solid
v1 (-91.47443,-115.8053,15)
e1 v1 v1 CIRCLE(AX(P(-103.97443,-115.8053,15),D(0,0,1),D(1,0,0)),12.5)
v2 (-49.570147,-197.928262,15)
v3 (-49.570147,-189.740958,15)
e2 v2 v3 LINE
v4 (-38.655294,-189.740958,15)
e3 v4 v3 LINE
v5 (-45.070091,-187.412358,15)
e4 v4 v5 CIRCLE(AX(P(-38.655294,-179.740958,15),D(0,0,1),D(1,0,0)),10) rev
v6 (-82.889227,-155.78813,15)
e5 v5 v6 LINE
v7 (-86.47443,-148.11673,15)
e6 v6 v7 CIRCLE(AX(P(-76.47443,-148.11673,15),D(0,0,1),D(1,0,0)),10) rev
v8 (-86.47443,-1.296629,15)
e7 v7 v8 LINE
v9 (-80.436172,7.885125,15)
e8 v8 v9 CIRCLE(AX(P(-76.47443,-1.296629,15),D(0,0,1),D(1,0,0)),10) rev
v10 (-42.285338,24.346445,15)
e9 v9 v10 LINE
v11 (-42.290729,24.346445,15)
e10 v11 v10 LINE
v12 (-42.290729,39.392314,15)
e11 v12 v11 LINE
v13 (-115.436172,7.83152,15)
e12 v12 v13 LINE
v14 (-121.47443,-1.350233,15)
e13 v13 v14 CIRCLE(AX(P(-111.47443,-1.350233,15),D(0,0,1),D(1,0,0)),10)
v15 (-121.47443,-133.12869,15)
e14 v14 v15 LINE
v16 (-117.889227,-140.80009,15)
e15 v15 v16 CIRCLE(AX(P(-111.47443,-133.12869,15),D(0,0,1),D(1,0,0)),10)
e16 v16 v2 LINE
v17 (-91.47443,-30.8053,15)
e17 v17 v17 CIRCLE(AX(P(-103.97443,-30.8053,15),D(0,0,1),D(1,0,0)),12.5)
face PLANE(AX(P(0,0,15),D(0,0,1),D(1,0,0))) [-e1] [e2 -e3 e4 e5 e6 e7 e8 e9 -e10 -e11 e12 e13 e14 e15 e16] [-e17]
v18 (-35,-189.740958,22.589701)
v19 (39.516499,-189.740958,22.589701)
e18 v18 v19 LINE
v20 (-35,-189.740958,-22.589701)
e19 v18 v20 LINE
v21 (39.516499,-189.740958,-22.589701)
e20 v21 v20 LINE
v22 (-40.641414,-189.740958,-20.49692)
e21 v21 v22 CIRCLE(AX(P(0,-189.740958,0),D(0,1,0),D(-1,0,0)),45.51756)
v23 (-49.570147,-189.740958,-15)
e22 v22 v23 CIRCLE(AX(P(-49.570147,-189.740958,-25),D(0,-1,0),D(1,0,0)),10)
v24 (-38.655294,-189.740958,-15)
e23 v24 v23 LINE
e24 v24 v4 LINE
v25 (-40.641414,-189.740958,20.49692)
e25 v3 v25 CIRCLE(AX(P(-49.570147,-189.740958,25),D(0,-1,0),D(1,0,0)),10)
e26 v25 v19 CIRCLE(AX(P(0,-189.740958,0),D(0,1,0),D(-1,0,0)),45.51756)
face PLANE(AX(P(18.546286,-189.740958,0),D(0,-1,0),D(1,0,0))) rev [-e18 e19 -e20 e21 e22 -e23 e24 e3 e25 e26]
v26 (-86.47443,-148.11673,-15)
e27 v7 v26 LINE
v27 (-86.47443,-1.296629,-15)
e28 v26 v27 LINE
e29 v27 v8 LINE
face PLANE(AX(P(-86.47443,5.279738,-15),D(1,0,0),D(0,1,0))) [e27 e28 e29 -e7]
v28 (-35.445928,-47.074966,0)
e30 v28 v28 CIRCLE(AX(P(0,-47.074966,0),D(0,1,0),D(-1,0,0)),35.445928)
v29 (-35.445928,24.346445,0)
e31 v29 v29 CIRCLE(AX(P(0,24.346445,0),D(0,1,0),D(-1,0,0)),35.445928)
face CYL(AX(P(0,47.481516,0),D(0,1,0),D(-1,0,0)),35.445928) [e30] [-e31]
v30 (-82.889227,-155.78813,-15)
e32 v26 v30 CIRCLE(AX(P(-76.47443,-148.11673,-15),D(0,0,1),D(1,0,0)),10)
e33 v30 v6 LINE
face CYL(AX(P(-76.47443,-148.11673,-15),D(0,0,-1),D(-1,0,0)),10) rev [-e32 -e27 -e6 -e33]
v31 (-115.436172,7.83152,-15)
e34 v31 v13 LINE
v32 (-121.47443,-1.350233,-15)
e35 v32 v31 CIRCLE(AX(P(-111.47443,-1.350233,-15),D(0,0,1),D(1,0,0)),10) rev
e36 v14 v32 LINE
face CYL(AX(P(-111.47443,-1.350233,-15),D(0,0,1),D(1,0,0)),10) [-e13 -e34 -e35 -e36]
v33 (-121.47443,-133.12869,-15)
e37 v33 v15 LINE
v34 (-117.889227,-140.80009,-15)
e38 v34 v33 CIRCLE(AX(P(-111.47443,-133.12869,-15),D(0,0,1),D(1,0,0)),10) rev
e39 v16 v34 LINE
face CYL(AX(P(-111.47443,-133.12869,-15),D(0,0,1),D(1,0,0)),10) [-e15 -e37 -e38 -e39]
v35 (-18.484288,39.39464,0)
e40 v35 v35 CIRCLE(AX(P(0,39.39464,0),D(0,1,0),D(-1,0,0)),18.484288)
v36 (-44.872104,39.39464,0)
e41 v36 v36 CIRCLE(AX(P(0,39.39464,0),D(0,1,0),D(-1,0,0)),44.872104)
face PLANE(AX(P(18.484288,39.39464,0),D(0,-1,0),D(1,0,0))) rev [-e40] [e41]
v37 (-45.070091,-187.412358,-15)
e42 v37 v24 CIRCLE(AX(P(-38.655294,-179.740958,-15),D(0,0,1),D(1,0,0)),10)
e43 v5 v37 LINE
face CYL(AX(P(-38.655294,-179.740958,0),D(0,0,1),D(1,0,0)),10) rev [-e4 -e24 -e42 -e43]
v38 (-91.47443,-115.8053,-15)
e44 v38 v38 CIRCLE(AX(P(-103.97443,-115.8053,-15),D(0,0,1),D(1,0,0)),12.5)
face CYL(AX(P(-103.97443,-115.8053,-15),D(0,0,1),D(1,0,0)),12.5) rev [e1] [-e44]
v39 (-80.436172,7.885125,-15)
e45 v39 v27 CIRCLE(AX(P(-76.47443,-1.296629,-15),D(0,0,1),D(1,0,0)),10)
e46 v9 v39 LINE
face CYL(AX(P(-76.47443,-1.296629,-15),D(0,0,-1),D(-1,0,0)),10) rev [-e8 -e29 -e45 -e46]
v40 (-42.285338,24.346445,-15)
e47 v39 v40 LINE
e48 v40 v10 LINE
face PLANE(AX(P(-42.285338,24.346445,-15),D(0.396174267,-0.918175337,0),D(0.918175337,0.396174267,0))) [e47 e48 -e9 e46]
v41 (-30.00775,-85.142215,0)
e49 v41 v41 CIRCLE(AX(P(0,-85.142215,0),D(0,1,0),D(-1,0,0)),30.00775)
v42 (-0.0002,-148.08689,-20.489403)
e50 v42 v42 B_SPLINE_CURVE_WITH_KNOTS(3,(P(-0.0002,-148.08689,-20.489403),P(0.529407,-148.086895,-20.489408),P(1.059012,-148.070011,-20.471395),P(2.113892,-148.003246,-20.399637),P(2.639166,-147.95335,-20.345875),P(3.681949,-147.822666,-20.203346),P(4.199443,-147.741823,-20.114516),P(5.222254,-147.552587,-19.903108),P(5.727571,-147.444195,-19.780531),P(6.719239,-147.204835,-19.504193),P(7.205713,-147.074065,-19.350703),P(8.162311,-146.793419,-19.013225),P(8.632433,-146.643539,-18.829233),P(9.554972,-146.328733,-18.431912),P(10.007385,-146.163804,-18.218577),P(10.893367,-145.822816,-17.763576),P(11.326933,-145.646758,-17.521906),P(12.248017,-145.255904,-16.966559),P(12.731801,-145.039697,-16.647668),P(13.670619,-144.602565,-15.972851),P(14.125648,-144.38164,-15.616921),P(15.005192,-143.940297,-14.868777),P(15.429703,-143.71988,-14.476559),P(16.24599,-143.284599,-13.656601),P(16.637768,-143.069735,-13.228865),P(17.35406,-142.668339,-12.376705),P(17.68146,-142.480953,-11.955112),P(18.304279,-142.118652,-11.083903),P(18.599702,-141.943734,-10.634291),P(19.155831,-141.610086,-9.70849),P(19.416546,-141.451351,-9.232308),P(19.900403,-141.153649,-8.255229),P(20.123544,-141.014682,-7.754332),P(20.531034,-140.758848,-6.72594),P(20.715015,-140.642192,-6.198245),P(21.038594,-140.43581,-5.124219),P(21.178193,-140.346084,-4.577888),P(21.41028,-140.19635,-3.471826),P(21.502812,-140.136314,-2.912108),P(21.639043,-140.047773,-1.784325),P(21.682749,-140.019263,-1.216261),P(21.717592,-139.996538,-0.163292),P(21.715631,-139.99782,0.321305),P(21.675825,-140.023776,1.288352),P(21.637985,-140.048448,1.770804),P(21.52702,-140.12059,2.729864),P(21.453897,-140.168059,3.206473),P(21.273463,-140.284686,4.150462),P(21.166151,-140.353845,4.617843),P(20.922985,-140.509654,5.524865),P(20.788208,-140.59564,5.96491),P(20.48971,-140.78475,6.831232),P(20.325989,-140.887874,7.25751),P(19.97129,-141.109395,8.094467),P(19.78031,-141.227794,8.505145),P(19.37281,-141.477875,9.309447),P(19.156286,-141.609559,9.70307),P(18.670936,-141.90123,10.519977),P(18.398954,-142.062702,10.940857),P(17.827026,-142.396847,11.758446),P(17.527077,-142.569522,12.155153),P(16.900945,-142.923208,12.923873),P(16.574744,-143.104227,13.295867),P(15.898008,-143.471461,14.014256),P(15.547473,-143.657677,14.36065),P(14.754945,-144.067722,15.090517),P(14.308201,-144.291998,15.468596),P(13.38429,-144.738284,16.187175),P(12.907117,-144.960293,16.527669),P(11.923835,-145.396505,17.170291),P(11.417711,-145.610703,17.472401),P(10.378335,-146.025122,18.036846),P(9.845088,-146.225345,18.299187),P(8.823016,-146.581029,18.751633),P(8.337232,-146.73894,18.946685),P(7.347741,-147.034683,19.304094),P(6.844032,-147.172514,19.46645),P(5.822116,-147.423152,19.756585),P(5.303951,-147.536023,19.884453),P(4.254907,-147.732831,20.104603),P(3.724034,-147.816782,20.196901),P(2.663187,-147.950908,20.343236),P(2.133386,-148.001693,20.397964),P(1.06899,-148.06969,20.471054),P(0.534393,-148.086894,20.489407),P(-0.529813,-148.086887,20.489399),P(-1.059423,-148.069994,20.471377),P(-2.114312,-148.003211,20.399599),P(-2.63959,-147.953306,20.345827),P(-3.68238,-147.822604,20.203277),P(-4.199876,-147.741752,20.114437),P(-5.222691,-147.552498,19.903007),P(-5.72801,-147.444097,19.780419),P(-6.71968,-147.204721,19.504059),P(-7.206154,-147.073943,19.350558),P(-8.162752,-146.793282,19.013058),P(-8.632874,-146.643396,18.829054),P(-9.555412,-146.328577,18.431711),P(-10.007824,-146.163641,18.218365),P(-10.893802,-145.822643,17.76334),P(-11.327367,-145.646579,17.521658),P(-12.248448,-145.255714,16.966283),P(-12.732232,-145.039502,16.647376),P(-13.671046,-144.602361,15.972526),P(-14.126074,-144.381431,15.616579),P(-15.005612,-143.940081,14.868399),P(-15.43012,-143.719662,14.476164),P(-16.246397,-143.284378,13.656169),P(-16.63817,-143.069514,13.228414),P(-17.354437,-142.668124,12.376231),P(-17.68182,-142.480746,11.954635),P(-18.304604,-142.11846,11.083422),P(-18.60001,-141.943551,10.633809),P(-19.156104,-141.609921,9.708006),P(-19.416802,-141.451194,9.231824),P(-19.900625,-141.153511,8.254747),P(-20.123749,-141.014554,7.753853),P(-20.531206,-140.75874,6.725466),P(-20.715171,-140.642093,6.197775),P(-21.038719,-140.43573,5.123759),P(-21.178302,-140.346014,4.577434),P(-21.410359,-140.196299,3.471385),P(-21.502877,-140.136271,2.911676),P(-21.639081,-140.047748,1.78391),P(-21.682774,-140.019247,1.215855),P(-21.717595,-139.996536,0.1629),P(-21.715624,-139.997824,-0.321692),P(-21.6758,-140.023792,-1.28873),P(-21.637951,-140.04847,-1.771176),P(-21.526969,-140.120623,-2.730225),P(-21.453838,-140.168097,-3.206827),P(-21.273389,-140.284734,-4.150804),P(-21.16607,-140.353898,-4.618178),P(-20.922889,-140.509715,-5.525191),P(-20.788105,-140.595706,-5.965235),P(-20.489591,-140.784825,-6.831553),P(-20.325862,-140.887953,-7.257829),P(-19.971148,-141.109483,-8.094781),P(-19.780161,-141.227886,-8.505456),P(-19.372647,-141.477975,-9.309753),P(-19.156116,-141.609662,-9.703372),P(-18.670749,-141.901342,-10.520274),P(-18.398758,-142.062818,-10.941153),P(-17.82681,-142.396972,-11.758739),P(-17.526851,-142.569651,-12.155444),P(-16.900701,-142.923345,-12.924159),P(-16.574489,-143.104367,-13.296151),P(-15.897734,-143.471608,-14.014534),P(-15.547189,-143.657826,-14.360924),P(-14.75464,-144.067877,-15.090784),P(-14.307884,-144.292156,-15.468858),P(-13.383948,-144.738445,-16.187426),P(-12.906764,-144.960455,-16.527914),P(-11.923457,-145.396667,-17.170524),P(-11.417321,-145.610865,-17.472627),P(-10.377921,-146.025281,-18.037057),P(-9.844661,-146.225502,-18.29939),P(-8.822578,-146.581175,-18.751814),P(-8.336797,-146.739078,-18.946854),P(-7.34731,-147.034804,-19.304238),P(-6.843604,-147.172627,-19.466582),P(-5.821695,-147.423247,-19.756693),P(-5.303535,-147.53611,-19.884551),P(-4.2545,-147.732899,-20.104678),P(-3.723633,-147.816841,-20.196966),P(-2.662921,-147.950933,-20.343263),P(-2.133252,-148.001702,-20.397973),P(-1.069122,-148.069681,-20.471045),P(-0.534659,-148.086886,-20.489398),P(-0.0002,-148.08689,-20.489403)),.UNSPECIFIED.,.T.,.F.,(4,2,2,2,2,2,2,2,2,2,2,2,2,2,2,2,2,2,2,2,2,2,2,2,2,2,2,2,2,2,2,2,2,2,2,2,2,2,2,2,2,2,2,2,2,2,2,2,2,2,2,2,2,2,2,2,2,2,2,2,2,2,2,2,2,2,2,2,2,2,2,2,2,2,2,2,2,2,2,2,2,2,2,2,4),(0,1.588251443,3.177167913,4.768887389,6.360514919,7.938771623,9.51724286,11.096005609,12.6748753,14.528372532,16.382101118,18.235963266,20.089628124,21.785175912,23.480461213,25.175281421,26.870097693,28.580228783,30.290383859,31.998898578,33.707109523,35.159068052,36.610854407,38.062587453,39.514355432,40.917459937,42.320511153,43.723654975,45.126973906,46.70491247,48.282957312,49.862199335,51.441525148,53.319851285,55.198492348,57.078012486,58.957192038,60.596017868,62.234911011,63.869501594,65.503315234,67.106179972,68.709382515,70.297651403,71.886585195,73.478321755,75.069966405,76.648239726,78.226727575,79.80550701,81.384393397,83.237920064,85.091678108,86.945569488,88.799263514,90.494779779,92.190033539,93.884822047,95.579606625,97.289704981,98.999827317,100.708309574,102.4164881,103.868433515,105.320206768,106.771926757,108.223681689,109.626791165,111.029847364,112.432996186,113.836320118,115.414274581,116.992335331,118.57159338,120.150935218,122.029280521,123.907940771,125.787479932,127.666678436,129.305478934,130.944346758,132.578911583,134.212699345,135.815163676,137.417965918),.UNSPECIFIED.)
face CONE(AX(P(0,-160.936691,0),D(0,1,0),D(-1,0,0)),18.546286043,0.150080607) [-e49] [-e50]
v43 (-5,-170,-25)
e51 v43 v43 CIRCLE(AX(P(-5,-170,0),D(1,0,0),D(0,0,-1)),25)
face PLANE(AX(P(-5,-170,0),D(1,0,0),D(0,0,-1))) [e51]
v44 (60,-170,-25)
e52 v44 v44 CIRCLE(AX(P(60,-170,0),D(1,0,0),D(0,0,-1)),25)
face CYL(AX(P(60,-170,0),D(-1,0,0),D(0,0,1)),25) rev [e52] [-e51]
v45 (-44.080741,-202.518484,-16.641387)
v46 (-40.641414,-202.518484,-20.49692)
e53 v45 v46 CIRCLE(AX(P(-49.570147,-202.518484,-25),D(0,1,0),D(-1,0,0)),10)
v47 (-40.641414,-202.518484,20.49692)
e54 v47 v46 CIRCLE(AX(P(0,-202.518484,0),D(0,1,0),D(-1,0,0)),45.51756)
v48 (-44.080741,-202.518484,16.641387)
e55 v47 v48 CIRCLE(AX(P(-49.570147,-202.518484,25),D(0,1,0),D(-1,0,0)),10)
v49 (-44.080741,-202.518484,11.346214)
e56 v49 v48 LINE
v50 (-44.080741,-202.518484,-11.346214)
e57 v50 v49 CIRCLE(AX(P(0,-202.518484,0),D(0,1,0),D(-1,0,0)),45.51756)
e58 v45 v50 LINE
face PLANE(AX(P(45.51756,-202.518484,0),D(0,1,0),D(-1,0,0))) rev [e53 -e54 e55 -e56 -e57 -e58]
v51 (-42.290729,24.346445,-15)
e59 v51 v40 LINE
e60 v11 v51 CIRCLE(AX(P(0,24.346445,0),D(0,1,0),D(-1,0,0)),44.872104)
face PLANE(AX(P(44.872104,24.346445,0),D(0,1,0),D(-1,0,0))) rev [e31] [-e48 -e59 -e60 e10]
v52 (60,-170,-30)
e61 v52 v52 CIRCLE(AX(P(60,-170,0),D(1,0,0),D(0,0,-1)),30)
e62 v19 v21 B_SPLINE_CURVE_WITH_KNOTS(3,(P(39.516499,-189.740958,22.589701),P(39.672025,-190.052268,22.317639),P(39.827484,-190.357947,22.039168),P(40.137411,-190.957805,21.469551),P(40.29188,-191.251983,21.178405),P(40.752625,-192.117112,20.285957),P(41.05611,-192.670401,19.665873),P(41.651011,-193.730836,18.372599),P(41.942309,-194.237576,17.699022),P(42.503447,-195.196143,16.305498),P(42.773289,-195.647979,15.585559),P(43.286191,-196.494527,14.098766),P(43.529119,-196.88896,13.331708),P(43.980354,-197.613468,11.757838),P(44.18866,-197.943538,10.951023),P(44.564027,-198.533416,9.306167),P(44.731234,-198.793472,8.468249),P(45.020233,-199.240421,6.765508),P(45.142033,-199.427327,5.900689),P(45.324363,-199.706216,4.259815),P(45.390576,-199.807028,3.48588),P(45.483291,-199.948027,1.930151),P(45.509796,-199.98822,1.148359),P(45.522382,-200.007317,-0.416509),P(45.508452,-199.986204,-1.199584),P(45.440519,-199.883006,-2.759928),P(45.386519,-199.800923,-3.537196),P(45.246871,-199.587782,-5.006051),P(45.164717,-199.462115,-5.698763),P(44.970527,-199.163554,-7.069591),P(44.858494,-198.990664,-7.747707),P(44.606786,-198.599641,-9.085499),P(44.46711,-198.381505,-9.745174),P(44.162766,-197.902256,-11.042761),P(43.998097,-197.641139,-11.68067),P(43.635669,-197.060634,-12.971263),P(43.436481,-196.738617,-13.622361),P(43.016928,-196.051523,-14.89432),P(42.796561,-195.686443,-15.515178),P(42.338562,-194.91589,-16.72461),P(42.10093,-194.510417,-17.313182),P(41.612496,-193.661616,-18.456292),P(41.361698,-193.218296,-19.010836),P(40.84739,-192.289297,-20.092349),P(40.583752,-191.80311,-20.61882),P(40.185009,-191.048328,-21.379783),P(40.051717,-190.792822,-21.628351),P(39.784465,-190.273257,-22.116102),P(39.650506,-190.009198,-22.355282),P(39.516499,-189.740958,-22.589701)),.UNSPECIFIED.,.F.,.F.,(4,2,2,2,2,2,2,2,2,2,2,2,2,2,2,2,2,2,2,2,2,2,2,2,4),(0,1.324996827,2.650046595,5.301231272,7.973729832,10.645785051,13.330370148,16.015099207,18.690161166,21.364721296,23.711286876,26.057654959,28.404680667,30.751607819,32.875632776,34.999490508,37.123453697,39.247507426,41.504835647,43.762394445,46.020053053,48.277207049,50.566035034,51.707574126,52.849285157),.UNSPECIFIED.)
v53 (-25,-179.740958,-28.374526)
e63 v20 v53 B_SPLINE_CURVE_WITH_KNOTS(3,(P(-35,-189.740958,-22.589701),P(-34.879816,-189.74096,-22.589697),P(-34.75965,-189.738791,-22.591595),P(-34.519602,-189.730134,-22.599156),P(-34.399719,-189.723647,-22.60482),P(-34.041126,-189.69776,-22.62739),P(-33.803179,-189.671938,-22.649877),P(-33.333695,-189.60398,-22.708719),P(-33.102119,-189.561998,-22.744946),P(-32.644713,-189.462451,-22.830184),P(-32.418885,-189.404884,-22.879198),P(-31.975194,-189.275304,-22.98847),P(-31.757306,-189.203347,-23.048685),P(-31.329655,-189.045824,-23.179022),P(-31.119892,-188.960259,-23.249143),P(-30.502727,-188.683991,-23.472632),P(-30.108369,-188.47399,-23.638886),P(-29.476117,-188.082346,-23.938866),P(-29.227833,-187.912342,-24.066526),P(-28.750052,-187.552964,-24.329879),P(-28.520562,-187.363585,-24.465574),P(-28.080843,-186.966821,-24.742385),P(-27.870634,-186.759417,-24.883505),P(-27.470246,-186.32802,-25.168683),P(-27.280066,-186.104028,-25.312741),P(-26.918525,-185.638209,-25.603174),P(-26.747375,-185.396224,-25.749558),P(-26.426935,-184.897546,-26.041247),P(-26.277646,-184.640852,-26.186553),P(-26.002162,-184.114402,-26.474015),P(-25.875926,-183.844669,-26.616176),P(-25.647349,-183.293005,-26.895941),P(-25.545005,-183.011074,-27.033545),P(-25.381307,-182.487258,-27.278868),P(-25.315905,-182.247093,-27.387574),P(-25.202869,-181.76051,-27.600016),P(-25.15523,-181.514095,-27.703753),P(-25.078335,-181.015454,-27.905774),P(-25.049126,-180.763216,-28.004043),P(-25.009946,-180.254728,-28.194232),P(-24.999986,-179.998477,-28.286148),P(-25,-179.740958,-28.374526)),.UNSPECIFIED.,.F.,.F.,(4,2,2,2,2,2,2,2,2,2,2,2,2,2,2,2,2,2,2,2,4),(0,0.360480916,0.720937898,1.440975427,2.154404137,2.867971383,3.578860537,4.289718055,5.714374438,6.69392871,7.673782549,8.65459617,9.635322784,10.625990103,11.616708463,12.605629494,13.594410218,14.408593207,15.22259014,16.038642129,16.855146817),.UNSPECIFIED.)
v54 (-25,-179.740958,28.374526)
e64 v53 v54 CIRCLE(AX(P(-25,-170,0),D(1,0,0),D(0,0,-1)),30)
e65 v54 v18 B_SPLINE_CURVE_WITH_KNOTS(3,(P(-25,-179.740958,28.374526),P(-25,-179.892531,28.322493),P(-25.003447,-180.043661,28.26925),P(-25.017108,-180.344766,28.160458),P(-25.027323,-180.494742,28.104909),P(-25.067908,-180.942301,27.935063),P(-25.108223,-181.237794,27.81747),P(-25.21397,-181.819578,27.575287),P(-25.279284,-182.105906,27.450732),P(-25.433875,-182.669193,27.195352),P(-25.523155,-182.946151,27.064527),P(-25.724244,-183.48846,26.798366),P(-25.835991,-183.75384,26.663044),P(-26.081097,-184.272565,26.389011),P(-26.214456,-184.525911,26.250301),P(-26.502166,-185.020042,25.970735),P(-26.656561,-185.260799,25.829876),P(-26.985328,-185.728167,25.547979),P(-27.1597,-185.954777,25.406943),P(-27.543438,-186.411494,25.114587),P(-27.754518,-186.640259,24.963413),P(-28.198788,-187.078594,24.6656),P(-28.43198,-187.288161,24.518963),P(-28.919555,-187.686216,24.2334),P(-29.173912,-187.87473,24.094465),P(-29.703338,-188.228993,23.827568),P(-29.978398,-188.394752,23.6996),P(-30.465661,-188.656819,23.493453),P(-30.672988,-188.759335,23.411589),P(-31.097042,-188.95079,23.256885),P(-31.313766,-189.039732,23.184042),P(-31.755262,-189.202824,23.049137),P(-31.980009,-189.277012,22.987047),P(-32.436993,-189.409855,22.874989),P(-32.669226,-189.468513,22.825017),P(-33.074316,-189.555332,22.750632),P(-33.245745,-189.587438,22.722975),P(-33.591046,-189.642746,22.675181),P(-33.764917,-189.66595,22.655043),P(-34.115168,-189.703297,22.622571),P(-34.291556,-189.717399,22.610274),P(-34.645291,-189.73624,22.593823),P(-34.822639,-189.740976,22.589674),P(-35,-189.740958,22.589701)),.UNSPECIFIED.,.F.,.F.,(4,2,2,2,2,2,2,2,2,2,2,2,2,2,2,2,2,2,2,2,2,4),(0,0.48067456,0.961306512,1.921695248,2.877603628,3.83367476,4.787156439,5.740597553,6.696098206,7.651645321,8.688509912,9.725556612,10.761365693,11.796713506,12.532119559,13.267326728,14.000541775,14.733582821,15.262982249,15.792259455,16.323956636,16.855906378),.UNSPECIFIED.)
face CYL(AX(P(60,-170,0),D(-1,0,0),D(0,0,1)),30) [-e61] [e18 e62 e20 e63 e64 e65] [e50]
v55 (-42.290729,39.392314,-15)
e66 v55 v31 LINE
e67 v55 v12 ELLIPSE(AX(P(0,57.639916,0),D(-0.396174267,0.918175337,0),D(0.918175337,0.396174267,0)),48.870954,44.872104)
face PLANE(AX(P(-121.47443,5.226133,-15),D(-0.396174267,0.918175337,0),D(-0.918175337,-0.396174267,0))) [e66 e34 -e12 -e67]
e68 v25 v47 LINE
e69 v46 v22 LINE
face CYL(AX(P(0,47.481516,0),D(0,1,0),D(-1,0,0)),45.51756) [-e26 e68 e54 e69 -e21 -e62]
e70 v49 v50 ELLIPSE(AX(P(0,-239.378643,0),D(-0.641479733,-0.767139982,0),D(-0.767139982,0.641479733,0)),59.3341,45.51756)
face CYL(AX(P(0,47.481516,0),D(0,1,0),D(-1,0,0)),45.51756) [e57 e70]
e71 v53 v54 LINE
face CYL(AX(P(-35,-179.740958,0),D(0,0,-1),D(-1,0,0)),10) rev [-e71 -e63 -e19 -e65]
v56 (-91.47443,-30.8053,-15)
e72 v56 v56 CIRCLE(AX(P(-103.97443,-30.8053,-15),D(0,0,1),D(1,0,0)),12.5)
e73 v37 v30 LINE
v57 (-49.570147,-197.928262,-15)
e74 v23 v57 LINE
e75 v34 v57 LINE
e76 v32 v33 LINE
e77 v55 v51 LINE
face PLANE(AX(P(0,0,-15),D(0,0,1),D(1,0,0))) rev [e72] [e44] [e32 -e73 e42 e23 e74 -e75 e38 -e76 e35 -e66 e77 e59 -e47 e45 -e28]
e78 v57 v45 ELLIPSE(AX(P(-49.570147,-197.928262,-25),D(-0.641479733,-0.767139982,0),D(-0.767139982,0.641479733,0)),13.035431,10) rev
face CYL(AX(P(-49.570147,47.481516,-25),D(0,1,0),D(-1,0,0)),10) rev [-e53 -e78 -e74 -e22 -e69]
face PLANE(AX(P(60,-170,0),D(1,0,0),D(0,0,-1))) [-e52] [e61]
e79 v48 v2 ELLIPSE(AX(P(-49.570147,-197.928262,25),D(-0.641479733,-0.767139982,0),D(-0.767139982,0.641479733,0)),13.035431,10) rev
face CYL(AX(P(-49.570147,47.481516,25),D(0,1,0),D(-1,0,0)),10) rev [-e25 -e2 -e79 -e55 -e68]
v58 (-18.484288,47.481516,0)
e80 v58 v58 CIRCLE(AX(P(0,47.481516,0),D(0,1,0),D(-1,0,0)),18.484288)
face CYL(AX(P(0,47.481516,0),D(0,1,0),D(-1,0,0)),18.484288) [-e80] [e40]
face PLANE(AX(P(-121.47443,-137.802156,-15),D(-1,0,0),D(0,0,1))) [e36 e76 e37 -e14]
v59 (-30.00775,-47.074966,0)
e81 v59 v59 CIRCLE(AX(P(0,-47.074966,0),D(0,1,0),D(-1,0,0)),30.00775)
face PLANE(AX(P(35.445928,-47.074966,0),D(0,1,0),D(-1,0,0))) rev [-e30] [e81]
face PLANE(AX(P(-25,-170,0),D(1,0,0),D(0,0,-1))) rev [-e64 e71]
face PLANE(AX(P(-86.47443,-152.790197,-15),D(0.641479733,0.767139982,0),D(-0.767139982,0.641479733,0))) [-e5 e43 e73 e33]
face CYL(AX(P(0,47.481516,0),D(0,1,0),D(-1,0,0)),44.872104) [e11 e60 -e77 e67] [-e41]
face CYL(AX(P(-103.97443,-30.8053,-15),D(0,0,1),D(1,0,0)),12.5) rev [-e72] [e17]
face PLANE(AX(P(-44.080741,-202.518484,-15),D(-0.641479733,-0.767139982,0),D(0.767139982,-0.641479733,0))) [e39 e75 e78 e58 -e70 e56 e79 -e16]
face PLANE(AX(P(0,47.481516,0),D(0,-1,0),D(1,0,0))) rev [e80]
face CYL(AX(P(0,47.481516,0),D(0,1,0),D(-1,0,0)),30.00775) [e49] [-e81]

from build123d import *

# Parameters (mm, degrees)
BOSS_EXTRUDE1_DEPTH      = 15
BOSS_EXTRUDE1_DEPTH_BACK = 15
SKETCH3_R                = 12.5
SKETCH4_R                = 30
SKETCH4_R_2              = 25
BOSS_EXTRUDE2_DEPTH      = 60
BOSS_EXTRUDE3_DEPTH      = 5
BOSS_EXTRUDE3_DEPTH_BACK = 25
SKETCH5_R                = 30
FILLET1_R                = 10
CUT_EXTRUDE1_START       = -65
SKETCH6_R                = 25
CUT_EXTRUDE1_DEPTH       = 65


with BuildPart() as part:
    # Sketch2 → Revolve1 (revolve)
    with BuildSketch(Plane.XY, mode=Mode.PRIVATE) as revolve1_sk:
        Polygon((0, 47.481515712), (18.484288355, 47.481515712), (18.484288355, 39.394639556), (44.872104392, 39.394639556), (44.872104392, 24.346445364), (35.445928293, 24.346445364), (35.445928293, -47.074965844), (30.007749775, -47.074965844), (30.007749775, -85.142215473), (18.546286043, -160.936690765), (18.546286043, -189.740958038), (45.517560074, -189.740958038), (45.517560074, -202.518484288), (0, -202.518484288), align=None)
    revolve(revolve1_sk.sketch.rotate(Axis((0, 47.481515712, 0), (0, -1, 0)), 180), axis=Axis((0, 47.481515712, 0), (0, -1, 0)))

    # Sketch3 → Boss-Extrude1 (add, two sides: drawn at the far end of the back side and taken through both)
    with BuildSketch(Plane.XY.offset(-BOSS_EXTRUDE1_DEPTH_BACK)):
        Polygon((-42.28533841, 24.346445364), (-86.474429819, 5.279737536), (-86.474429819, -152.790196511), (-42.28533841, -189.740958038), (-42.28533841, -202.518484288), (-44.080740722, -202.518484288), (-121.474429819, -137.802155929), (-121.474429819, 5.226132785), (-42.28533841, 39.394639556), align=None)
        with Locations((-103.974429819, -30.80530006)):
            Circle(SKETCH3_R, mode=Mode.SUBTRACT)
        with Locations((-103.974429819, -115.80530006)):
            Circle(SKETCH3_R, mode=Mode.SUBTRACT)
    extrude(amount=BOSS_EXTRUDE1_DEPTH + BOSS_EXTRUDE1_DEPTH_BACK)

    # Sketch4 → Boss-Extrude2 (add)
    with BuildSketch(Plane(origin=(0, 0, 0), x_dir=(0, 0, -1), z_dir=(1, 0, 0))):
        with Locations(Location((0, -170, 0), (0, 0, 221.149949101))):
            Circle(SKETCH4_R)
        with Locations(Location((0, -170, 0), (0, 0, 141.388518695))):
            Circle(SKETCH4_R_2, mode=Mode.SUBTRACT)
    extrude(amount=BOSS_EXTRUDE2_DEPTH)

    # Sketch5 → Boss-Extrude3 (add, two sides: drawn at the far end of the back side and taken through both)
    with BuildSketch(Plane(origin=(0, 0, 0), x_dir=(0, 0, -1), z_dir=(1, 0, 0)).offset(-BOSS_EXTRUDE3_DEPTH_BACK)):
        with Locations(Location((0, -170, 0), (0, 0, 221.149949101))):
            Circle(SKETCH5_R)
    extrude(amount=BOSS_EXTRUDE3_DEPTH + BOSS_EXTRUDE3_DEPTH_BACK)

    # Fillet1
    # the kernel refuses this fillet: 10 mm, written as the material it adds along each edge
    with BuildSketch(Plane(origin=(-42.974972659, -189.740958038, 15), x_dir=(-1, 0, 0), z_dir=(0, -1, 0))) as fillet1_piece_1_section:
        with BuildLine():
            CenterArc((6.59517437, -10), FILLET1_R, 90, 63.23655504)
            ThreePointArc((-2.333558622, -5.49692026), (-1.076535169, -2.786770672), (0, 0))
            Line((0, 0), (6.59517437, 0))
        make_face()
    fillet1_piece_1 = extrude(amount=12.777526251, mode=Mode.PRIVATE)
    fillet1_piece_1 = split(fillet1_piece_1, bisect_by=Plane(origin=(-48.522573574, -198.80423941, 19.040168561), z_dir=(0.6414797327096047, 0.7671399823518614, 0)), keep=Keep.TOP, mode=Mode.PRIVATE)
    add(fillet1_piece_1)
    with BuildSketch(Plane(origin=(-42.974972659, -189.740958038, -15), x_dir=(0.3907672257300362, 0, -0.9204895302474932), z_dir=(0, -1, 0))) as fillet1_piece_2_section:
        with BuildLine():
            CenterArc((6.627717311, -9.978461215), FILLET1_R, 93.76119811, 63.23655504)
            Line((-2.577177992, -6.070788958), (0, 0))
            ThreePointArc((0, 0), (2.985867888, -0.098039292), (5.971735777, 0))
        make_face()
    fillet1_piece_2 = extrude(amount=12.777526251, mode=Mode.PRIVATE)
    fillet1_piece_2 = split(fillet1_piece_2, bisect_by=Plane(origin=(-48.522573573, -198.80423941, -19.04016856), z_dir=(0.6414797327096047, 0.7671399823518614, 0)), keep=Keep.TOP, mode=Mode.PRIVATE)
    add(fillet1_piece_2)
    with BuildSketch(Plane(origin=(-86.474429819, 5.279737536, 15), x_dir=(0.9181753374265987, 0.39617426688460156, 0), z_dir=(0, 0, -1))) as fillet1_piece_3:
        with BuildLine():
            CenterArc((FILLET1_R * 0.657636628324, FILLET1_R), FILLET1_R, 203.339230224, 66.660769776)
            Line((-FILLET1_R * 0.260538709103, FILLET1_R * 0.603825733115), (0, 0))
            Line((0, 0), (FILLET1_R * 0.657636628324, 0))
        make_face()
    extrude(amount=30)
    with BuildSketch(Plane(origin=(-86.474429819, -152.790196511, 15), x_dir=(0, 1, 0), z_dir=(0, 0, -1))) as fillet1_piece_4:
        with BuildLine():
            CenterArc((FILLET1_R * 0.467346606276, FILLET1_R), FILLET1_R, 219.902248143, 50.097751857)
            Line((-FILLET1_R * 0.299793376076, FILLET1_R * 0.35852026729), (0, 0))
            Line((0, 0), (FILLET1_R * 0.467346606276, 0))
        make_face()
    extrude(amount=30)
    with BuildSketch(Plane(origin=(-42.28533841, -189.740958038, 15), x_dir=(-0.7671399823518606, 0.6414797327096056, 0), z_dir=(0, 0, -1))) as fillet1_piece_5:
        with BuildLine():
            CenterArc((FILLET1_R * 0.363004481318, FILLET1_R), FILLET1_R, 230.097751857, 39.902248143)
            Line((-FILLET1_R * 0.278475251392, FILLET1_R * 0.232860017648), (0, 0))
            Line((0, 0), (FILLET1_R * 0.363004481318, 0))
        make_face()
    extrude(amount=30)
    with BuildSketch(Plane(origin=(-25, -189.740958038, 47.589700656), x_dir=(-1, 0, 0), z_dir=(0, 0, -1))) as fillet1_piece_6_section:
        with BuildLine():
            CenterArc((FILLET1_R, FILLET1_R), FILLET1_R, 180, 90)
            Line((0, FILLET1_R), (0, 0))
            Line((0, 0), (FILLET1_R, 0))
        make_face()
    fillet1_piece_6 = extrude(amount=95.179401313, mode=Mode.PRIVATE)
    fillet1_piece_6 = fillet1_piece_6 & Plane(origin=(-27.186425599, -170, 0), x_dir=(0, -0.6580319345943207, 0.7529900218821333), z_dir=(-1, 0, 0)) * Cylinder(30, 231, mode=Mode.PRIVATE)
    add(fillet1_piece_6)
    # the kernel refuses this fillet: 10 mm, written as the material it takes off along each edge
    with BuildSketch(Plane(origin=(-121.474429819, -137.802155929, 26.683665157), x_dir=(0, 1, 0), z_dir=(0, 0, -1))) as fillet1_2_piece_1:
        with BuildLine():
            CenterArc((FILLET1_R * 0.467346606276, FILLET1_R), FILLET1_R, 219.902248143, 50.097751857)
            Line((-FILLET1_R * 0.299793376076, FILLET1_R * 0.35852026729), (0, 0))
            Line((0, 0), (FILLET1_R * 0.467346606276, 0))
        make_face()
    extrude(amount=53.367330314, mode=Mode.SUBTRACT)
    with BuildSketch(Plane(origin=(-121.474429819, 5.226132785, -31.440915708), x_dir=(0, -1, 0), z_dir=(0, 0, 1))) as fillet1_2_piece_2:
        with BuildLine():
            CenterArc((FILLET1_R * 0.657636628324, FILLET1_R), FILLET1_R, 203.339230224, 66.660769776)
            Line((-FILLET1_R * 0.260538709103, FILLET1_R * 0.603825733115), (0, 0))
            Line((0, 0), (FILLET1_R * 0.657636628324, 0))
        make_face()
    extrude(amount=62.881831416, mode=Mode.SUBTRACT)

    # Sketch6 → Cut-Extrude1 (cut)
    with BuildSketch(Plane(origin=(60, 0, 0), x_dir=(0, 0, -1), z_dir=(1, 0, 0)).offset(CUT_EXTRUDE1_START)):
        with Locations((0, -170)):
            Circle(SKETCH6_R)
    extrude(amount=CUT_EXTRUDE1_DEPTH, mode=Mode.SUBTRACT)


solid = part.part
